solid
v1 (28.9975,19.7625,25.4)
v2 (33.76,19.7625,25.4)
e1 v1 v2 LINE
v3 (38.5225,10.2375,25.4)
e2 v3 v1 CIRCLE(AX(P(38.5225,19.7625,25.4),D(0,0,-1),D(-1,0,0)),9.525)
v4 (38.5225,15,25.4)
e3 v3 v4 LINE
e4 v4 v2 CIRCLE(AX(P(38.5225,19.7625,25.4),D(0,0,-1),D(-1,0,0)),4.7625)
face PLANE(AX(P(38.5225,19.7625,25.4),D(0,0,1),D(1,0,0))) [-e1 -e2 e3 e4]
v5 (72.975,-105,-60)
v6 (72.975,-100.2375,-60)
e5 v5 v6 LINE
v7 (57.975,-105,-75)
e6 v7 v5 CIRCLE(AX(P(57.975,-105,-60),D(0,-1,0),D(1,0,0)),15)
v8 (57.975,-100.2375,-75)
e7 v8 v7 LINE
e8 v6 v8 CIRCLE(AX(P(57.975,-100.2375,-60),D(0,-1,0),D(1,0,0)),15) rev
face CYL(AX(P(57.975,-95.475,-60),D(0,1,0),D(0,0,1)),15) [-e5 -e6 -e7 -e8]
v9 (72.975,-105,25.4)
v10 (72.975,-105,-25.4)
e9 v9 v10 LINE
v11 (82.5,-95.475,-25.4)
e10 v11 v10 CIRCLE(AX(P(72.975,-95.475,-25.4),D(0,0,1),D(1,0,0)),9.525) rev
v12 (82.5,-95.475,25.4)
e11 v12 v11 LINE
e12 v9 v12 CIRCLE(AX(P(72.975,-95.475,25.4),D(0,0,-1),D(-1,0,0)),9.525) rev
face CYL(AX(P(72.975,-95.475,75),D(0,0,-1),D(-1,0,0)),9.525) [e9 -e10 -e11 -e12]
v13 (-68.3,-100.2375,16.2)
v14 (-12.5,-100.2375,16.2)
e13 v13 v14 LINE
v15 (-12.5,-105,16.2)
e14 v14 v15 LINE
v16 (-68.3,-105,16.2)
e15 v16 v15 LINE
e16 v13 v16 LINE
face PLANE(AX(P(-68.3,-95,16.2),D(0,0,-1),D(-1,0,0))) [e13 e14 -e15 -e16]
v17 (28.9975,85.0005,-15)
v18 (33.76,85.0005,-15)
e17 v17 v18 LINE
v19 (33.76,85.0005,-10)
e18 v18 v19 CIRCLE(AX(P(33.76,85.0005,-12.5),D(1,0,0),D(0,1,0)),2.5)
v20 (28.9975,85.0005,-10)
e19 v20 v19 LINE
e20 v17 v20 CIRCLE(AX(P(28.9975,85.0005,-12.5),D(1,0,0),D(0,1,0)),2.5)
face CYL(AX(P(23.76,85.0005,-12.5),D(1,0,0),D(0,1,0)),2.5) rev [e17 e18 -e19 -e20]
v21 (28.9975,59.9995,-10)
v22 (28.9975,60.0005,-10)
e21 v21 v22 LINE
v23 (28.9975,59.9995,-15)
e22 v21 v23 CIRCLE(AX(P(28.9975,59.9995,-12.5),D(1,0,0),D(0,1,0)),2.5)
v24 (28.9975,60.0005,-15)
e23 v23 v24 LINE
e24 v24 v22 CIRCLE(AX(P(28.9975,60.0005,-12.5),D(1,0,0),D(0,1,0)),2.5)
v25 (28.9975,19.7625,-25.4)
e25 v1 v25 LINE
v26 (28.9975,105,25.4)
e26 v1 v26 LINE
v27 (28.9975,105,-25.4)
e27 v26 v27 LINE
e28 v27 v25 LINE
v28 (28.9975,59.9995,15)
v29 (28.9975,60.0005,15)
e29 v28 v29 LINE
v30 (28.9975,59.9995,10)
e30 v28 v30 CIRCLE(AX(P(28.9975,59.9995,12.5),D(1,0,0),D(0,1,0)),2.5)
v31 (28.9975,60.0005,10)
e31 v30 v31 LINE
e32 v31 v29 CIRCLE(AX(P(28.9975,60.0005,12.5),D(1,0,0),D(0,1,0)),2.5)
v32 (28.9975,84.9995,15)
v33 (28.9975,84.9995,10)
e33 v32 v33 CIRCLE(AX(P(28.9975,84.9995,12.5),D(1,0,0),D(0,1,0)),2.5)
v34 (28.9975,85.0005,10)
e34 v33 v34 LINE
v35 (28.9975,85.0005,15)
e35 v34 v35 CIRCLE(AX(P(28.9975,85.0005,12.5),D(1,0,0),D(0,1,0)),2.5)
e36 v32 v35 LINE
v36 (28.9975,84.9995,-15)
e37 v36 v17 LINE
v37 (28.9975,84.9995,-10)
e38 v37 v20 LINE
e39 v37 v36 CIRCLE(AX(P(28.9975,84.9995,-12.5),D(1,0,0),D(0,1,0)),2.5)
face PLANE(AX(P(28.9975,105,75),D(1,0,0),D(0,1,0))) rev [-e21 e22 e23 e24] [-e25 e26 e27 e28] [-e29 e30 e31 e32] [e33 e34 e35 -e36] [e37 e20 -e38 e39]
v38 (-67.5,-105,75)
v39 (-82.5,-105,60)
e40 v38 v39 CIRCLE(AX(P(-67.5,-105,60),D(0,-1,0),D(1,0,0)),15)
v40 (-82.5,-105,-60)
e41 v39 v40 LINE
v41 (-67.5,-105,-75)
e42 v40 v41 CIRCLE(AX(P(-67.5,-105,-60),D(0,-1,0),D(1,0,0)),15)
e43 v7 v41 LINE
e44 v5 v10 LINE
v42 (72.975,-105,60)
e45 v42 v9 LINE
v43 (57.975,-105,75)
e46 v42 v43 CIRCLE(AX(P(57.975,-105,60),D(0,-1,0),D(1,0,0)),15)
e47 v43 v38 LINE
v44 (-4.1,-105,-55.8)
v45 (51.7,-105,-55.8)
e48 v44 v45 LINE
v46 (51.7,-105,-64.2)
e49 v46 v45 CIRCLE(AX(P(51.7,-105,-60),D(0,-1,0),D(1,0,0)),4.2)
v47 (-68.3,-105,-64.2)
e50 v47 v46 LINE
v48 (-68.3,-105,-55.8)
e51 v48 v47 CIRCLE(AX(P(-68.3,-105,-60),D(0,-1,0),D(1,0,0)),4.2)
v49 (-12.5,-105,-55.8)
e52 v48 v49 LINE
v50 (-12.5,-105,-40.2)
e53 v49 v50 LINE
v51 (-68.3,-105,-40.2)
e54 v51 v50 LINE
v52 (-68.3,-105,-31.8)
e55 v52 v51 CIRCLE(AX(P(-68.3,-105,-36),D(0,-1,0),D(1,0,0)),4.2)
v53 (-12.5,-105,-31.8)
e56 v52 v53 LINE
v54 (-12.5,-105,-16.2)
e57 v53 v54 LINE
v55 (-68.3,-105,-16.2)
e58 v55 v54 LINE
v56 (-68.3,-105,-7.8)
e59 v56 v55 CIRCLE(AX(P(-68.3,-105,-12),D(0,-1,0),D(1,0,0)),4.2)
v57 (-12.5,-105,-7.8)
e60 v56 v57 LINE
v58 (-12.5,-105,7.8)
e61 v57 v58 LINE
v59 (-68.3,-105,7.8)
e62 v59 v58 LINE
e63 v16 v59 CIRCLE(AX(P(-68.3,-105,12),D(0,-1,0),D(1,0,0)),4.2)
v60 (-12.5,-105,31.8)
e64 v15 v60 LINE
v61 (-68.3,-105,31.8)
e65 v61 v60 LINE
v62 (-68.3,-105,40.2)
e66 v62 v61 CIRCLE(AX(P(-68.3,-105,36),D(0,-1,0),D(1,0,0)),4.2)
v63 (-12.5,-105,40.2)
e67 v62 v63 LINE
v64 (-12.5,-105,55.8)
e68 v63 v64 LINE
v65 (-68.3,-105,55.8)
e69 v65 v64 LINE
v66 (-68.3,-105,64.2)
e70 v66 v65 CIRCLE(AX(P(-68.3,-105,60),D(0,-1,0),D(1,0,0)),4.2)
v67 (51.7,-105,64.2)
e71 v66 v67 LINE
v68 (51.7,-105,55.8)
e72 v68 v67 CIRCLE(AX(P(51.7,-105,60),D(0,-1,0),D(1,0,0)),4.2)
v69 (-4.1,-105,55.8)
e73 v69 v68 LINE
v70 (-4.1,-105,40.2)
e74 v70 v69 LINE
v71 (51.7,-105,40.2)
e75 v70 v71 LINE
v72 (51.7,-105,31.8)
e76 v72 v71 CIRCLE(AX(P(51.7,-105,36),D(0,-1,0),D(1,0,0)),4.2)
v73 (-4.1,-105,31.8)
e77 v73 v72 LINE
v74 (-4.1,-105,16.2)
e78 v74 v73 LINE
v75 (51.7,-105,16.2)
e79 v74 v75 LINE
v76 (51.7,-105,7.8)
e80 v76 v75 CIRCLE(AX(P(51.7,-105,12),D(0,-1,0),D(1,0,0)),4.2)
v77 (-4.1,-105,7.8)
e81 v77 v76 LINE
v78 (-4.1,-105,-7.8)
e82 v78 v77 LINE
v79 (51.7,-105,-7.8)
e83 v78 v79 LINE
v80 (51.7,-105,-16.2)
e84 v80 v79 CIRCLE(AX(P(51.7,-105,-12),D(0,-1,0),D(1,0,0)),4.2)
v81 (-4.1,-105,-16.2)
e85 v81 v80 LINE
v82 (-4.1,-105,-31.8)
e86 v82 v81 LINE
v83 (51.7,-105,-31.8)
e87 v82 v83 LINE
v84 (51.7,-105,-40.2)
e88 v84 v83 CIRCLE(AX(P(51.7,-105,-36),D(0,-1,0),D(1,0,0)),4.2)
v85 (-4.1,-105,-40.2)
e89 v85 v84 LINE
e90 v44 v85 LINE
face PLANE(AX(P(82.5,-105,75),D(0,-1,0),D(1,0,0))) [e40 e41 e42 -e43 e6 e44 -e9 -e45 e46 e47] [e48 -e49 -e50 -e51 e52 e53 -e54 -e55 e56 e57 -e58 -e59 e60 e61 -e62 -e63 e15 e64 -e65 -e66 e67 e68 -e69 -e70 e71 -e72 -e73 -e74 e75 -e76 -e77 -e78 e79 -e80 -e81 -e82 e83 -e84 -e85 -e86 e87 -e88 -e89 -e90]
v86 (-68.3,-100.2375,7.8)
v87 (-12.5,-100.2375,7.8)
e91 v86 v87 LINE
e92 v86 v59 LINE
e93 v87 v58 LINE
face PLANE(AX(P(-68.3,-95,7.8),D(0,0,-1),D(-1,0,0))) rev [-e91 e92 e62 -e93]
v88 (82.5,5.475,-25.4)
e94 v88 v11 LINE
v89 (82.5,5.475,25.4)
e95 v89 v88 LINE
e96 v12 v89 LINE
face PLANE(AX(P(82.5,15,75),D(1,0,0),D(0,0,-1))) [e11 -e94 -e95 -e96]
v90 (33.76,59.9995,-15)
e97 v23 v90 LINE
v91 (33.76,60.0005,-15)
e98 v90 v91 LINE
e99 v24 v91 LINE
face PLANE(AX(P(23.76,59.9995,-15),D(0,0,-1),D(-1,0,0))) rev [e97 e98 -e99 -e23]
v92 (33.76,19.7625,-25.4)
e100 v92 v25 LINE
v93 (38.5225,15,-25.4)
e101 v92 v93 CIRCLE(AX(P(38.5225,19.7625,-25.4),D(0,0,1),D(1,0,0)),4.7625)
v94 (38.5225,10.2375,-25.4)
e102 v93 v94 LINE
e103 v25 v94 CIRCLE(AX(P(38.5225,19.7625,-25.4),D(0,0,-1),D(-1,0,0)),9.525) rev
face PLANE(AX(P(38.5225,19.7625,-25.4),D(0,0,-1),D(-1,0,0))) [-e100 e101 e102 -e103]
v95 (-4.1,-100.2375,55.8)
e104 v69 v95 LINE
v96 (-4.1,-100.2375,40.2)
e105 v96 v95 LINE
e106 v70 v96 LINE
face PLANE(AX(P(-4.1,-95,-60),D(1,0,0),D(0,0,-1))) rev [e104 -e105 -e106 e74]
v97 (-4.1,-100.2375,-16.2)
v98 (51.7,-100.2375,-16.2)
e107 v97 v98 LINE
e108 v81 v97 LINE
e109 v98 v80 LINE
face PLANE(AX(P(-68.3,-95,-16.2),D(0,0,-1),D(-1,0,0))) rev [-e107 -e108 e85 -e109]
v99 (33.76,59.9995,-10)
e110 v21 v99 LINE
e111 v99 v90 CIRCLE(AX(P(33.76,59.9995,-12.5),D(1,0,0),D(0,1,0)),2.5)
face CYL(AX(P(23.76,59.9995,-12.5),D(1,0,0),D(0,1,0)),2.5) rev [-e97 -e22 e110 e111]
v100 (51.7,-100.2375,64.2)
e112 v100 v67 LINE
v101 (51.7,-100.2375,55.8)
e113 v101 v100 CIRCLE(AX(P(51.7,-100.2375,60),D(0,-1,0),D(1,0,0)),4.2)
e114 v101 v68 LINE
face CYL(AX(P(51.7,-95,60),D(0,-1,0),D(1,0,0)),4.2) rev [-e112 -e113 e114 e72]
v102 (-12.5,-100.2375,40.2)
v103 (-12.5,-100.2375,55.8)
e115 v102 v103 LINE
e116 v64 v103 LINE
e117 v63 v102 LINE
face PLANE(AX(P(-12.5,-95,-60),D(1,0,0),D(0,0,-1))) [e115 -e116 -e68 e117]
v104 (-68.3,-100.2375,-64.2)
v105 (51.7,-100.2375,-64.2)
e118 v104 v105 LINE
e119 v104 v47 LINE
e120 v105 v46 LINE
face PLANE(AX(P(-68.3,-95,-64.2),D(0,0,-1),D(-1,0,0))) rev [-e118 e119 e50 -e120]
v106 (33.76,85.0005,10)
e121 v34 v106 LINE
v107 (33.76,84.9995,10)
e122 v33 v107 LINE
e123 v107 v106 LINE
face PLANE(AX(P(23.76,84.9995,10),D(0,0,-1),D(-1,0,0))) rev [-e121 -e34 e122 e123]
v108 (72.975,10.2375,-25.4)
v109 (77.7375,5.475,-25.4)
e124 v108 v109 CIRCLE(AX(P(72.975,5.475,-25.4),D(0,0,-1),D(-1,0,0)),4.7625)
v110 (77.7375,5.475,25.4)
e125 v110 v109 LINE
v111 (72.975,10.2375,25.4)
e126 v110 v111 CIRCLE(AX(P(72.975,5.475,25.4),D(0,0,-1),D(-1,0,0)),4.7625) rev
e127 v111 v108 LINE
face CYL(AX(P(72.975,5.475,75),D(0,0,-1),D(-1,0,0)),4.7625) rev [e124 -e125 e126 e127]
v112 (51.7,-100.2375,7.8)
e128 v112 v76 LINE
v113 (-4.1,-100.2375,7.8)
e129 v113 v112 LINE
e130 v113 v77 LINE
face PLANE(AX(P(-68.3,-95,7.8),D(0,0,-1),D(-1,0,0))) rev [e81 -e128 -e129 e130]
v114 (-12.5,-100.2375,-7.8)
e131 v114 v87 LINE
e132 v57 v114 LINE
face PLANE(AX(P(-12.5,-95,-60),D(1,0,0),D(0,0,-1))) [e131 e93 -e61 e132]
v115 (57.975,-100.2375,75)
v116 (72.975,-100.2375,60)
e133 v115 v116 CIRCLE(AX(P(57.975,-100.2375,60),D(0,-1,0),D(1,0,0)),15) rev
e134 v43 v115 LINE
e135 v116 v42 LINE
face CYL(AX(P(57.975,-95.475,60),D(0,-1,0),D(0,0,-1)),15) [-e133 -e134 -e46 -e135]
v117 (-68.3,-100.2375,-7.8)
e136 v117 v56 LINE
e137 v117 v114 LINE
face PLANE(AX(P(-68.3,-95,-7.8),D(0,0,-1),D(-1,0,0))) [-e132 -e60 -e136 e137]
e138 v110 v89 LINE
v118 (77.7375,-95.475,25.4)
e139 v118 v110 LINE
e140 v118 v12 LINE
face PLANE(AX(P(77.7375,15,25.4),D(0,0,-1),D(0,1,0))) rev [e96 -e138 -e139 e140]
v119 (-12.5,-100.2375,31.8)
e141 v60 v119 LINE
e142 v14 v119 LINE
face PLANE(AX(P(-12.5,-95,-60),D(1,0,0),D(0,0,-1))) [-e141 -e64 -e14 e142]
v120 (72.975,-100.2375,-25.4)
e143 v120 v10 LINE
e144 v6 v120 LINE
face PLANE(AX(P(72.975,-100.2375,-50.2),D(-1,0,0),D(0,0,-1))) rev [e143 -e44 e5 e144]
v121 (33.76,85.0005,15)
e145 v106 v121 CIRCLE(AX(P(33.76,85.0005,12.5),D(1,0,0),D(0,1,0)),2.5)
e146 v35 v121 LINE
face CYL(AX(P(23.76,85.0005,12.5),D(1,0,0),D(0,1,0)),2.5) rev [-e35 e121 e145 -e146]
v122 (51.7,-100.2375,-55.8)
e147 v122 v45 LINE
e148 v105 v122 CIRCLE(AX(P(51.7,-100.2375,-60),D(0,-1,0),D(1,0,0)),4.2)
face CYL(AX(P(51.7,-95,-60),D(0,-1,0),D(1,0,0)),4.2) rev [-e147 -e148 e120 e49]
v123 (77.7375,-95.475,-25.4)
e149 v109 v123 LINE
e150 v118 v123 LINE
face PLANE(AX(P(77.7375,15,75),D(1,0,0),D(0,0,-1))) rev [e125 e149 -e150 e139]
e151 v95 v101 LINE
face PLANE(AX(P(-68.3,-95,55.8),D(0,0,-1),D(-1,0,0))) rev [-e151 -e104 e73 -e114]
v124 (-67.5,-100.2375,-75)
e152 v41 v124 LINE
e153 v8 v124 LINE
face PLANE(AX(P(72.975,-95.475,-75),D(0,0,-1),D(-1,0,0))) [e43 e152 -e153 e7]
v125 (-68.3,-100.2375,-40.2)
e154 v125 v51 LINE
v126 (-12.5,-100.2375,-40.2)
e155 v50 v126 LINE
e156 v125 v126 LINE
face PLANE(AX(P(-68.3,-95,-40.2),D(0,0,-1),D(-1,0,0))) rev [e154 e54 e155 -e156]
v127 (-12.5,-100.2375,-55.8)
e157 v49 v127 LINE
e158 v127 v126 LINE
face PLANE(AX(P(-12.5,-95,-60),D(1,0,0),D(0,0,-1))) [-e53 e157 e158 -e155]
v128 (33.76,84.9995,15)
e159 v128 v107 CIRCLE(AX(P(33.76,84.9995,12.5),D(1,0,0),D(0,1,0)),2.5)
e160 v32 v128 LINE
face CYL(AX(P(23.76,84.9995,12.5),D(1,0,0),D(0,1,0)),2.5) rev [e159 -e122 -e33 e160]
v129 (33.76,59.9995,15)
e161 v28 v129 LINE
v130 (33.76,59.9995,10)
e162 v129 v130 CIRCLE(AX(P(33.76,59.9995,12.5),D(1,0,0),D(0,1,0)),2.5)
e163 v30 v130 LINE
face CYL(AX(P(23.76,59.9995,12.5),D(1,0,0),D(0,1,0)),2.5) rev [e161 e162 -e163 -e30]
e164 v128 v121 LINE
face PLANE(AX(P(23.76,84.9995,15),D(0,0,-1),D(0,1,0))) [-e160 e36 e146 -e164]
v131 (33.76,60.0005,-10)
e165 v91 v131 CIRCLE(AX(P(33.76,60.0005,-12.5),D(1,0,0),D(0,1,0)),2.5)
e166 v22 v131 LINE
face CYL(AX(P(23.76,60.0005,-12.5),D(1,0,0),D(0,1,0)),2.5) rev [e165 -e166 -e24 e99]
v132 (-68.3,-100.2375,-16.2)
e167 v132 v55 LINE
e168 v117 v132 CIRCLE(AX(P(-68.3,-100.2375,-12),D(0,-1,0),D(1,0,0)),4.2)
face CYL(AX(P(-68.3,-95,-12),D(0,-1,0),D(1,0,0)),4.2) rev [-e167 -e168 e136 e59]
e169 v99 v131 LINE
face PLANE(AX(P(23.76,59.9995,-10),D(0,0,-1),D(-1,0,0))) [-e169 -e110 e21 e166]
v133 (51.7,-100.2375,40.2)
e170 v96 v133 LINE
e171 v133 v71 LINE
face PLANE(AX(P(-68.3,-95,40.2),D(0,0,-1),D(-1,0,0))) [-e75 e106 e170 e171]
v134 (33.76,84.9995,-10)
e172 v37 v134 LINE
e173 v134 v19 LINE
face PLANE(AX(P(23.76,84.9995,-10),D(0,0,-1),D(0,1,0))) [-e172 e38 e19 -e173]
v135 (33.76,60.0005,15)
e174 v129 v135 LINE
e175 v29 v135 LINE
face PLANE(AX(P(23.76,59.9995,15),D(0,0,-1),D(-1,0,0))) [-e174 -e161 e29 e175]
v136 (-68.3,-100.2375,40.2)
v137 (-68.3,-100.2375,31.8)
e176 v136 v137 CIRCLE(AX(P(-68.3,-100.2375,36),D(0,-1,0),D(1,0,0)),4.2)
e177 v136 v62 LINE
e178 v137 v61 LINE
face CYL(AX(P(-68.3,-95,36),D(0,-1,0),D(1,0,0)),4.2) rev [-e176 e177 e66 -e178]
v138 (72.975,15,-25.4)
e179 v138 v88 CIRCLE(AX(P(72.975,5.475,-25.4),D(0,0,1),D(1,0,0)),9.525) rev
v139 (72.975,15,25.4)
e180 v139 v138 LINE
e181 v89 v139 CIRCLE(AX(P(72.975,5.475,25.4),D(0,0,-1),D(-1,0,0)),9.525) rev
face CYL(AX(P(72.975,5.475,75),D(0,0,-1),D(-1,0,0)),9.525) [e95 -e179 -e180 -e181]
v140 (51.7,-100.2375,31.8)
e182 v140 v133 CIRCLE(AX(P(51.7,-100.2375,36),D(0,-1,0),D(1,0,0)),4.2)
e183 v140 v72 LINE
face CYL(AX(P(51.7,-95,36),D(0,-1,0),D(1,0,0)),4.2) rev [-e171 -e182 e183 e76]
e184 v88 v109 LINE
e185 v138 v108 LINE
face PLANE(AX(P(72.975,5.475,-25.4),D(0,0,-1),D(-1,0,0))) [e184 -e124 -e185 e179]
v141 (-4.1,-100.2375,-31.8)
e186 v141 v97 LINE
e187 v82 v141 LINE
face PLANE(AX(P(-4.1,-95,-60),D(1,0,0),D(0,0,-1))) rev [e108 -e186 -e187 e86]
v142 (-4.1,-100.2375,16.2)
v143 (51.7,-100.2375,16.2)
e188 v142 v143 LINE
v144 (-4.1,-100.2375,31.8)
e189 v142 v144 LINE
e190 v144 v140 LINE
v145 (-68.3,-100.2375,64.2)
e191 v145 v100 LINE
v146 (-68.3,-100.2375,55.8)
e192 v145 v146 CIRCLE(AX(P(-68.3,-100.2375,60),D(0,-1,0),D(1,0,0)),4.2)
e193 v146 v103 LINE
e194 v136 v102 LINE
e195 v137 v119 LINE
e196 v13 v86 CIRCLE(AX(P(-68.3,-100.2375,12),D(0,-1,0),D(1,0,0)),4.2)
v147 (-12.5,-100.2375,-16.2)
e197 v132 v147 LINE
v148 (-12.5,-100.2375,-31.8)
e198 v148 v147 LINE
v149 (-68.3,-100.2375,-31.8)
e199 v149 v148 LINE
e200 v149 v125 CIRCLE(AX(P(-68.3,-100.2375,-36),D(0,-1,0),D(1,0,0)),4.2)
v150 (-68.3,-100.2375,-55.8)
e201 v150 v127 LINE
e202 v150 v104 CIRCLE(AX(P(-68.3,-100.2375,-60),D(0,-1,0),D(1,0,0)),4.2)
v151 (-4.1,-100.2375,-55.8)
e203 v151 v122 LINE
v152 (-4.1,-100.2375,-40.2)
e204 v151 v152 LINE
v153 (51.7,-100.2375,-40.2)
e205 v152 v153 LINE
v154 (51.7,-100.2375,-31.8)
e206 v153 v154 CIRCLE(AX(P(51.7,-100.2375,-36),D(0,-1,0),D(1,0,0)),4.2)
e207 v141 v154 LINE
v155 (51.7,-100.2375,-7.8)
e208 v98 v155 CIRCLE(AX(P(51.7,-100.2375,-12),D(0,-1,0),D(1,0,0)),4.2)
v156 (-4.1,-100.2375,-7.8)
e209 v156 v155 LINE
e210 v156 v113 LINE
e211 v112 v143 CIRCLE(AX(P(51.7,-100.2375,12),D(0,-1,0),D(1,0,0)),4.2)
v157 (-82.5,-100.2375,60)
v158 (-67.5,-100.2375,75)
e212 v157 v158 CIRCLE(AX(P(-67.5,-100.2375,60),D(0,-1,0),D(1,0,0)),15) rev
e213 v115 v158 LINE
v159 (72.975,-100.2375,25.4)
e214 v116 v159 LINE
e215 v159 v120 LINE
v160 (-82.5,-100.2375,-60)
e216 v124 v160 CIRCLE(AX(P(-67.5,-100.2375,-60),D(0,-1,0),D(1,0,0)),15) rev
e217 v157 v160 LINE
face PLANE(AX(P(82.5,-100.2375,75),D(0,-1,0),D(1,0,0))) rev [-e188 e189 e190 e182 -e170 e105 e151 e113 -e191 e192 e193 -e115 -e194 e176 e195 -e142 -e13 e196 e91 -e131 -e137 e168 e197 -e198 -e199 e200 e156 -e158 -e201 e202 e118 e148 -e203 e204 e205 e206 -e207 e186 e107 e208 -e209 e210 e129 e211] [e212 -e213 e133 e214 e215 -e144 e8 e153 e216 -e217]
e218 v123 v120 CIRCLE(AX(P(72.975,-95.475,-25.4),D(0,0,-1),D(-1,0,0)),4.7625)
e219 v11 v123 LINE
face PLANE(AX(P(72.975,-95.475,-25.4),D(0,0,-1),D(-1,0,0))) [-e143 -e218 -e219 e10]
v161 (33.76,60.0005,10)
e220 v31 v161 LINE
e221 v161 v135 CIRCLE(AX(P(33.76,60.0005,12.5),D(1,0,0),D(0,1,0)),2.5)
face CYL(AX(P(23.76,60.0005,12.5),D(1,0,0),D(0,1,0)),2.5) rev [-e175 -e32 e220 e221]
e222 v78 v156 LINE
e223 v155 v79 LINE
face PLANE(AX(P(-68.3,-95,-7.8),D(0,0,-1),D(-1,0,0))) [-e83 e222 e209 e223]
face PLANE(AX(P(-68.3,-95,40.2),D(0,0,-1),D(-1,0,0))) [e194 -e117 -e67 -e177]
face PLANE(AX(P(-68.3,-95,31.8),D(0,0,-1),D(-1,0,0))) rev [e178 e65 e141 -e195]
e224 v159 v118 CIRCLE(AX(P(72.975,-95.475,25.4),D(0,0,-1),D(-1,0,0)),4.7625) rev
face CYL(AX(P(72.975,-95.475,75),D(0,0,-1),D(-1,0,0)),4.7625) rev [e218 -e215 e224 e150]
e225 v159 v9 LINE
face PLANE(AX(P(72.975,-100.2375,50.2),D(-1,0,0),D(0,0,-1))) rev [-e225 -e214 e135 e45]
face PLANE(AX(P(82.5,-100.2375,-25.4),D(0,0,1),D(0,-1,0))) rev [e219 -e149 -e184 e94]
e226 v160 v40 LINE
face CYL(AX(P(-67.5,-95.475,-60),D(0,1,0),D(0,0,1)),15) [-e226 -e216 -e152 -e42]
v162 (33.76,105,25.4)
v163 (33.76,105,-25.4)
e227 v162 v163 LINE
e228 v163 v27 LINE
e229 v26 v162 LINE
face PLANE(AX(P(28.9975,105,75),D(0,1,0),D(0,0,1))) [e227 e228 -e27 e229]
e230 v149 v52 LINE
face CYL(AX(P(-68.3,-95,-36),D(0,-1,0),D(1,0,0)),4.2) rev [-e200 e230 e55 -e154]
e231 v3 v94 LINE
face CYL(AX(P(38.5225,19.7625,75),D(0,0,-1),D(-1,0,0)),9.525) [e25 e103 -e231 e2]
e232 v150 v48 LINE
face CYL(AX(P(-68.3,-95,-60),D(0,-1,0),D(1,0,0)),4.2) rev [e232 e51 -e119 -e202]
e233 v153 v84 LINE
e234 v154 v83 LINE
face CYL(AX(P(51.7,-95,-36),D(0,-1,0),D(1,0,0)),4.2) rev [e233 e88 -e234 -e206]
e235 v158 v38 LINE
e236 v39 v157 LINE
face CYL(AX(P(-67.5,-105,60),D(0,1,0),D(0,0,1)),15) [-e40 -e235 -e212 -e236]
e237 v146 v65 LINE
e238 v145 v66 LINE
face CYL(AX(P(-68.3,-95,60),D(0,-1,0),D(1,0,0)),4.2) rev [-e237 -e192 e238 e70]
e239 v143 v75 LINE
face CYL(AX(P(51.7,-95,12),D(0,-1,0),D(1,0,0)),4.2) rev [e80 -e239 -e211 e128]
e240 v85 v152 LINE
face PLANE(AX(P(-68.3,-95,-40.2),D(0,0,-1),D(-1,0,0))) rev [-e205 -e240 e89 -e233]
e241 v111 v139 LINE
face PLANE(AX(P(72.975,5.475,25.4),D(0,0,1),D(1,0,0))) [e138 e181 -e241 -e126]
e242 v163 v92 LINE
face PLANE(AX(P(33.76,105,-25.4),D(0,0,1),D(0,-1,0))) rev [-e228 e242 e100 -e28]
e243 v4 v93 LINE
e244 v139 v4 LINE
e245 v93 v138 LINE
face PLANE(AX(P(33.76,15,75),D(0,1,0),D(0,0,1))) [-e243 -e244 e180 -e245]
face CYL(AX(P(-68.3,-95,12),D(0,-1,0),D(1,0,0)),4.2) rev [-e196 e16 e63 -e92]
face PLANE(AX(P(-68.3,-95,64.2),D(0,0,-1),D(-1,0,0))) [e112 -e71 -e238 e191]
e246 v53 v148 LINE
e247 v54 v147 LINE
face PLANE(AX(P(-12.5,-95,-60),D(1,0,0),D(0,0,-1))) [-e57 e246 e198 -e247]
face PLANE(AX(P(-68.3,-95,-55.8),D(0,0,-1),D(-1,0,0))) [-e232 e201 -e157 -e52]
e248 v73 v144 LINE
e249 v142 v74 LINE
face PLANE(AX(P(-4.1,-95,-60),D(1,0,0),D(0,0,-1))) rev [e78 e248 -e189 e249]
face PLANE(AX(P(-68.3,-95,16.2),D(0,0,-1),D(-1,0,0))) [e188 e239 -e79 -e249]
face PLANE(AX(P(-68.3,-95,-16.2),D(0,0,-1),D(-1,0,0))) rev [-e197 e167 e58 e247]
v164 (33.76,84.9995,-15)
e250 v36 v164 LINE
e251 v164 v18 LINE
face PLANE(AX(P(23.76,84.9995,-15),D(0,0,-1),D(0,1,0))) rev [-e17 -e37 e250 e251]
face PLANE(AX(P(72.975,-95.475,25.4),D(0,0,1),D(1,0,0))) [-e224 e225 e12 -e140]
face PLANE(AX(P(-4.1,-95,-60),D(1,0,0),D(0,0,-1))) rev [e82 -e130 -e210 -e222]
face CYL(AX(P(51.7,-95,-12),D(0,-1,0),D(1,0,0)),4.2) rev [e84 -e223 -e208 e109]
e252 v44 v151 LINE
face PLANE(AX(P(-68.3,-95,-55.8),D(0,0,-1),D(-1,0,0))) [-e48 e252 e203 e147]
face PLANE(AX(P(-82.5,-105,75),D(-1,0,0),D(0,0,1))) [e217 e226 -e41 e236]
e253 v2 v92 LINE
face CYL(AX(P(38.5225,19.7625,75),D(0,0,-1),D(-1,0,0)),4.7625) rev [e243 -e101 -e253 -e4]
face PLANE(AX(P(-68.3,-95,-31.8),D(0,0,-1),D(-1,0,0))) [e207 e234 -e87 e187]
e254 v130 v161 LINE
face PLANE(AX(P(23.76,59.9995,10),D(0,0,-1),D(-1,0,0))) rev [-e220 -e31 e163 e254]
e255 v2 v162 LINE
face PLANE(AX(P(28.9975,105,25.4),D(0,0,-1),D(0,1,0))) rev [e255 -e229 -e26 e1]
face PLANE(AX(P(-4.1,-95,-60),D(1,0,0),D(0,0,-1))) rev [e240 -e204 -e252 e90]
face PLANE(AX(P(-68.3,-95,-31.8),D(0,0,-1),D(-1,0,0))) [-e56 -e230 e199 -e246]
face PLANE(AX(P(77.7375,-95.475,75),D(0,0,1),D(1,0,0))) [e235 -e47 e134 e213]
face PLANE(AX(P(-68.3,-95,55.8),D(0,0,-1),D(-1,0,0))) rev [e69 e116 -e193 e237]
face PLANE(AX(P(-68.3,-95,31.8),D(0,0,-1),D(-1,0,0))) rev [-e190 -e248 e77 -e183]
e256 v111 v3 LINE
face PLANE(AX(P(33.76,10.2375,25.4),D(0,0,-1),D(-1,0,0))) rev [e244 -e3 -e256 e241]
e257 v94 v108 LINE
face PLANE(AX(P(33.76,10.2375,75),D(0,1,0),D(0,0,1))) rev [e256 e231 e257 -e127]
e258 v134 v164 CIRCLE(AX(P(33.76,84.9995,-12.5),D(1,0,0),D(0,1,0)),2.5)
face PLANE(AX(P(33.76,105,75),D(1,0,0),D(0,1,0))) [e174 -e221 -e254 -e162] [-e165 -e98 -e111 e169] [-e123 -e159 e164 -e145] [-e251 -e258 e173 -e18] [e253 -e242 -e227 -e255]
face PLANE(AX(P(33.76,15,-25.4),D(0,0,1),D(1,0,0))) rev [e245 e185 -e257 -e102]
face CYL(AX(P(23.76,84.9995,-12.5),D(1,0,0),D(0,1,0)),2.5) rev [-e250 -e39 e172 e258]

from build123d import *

# Parameters (mm, degrees)
BRIDA_BASE1_DEPTH           = 75
CORTAR_EXTRUIR1_START       = -9.525
CORTAR_EXTRUIR1_OUTLINE_W   = 49.6
CORTAR_EXTRUIR1_OUTLINE_H   = 121
CORTAR_EXTRUIR1_DEPTH       = 9.525
CORTAR_EXTRUIR1_START_2     = -53.5025
CORTAR_EXTRUIR1_2_OUTLINE_W = 49.6
CORTAR_EXTRUIR1_2_OUTLINE_H = 94.7625
CORTAR_EXTRUIR1_2_DEPTH     = 43.9775
CORTAR_EXTRUIR2_DEPTH       = 10
CORTAR_EXTRUIR3_DEPTH       = 10
REDONDEO1_R                 = 15


# Read off the part's stored shape, not the designer's step: Cortar-Extruir1
# Sheet-metal steps are written as plain solids
with BuildPart() as part:
    # Croquis1 → Brida base1 (new, symmetric)
    with BuildSketch(Plane.XY):
        with BuildLine():
            Line((33.76, 105), (33.76, 19.7625))
            ThreePointArc((33.76, 19.7625), (35.154903955, 16.394903955), (38.5225, 15))
            Line((38.5225, 15), (72.975, 15))
            ThreePointArc((72.975, 15), (79.710192091, 12.210192091), (82.5, 5.475))
            Line((82.5, 5.475), (82.5, -95.475))
            ThreePointArc((82.5, -95.475), (79.710192091, -102.210192091), (72.975, -105))
            Line((72.975, -105), (-82.5, -105))
            Line((-82.5, -105), (-82.5, -100.2375))
            Line((-82.5, -100.2375), (72.975, -100.2375))
            ThreePointArc((72.975, -100.2375), (76.342596045, -98.842596045), (77.7375, -95.475))
            Line((77.7375, -95.475), (77.7375, 5.475))
            ThreePointArc((77.7375, 5.475), (76.342596045, 8.842596045), (72.975, 10.2375))
            Line((72.975, 10.2375), (38.5225, 10.2375))
            ThreePointArc((38.5225, 10.2375), (31.787307909, 13.027307909), (28.9975, 19.7625))
            Line((28.9975, 19.7625), (28.9975, 105))
            Line((28.9975, 105), (33.76, 105))
        make_face()
    extrude(amount=BRIDA_BASE1_DEPTH, both=True)

    # Cortar-Extruir1 outline → Cortar-Extruir1 (cut)
    with BuildSketch(Plane(origin=(82.5, 0, 0), x_dir=(0, 0, -1), z_dir=(1, 0, 0)).offset(CORTAR_EXTRUIR1_START)):
        with Locations((50.2, -45.5)):
            Rectangle(CORTAR_EXTRUIR1_OUTLINE_W, CORTAR_EXTRUIR1_OUTLINE_H)
        with Locations((-50.2, -45.5)):
            Rectangle(CORTAR_EXTRUIR1_OUTLINE_W, CORTAR_EXTRUIR1_OUTLINE_H)
    extrude(amount=CORTAR_EXTRUIR1_DEPTH, mode=Mode.SUBTRACT)

    # Cortar-Extruir1 2 outline → Cortar-Extruir1 2 (cut)
    with BuildSketch(Plane(origin=(82.5, 0, 0), x_dir=(0, 0, -1), z_dir=(1, 0, 0)).offset(CORTAR_EXTRUIR1_START_2)):
        with Locations((50.2, 57.61875)):
            Rectangle(CORTAR_EXTRUIR1_2_OUTLINE_W, CORTAR_EXTRUIR1_2_OUTLINE_H)
        with Locations((-50.2, 57.61875)):
            Rectangle(CORTAR_EXTRUIR1_2_OUTLINE_W, CORTAR_EXTRUIR1_2_OUTLINE_H)
    extrude(amount=CORTAR_EXTRUIR1_2_DEPTH, mode=Mode.SUBTRACT)

    # Croquis7 → Cortar-Extruir2 (cut)
    with BuildSketch(Plane(origin=(33.76, 0, 0), x_dir=(0, 0, -1), z_dir=(1, 0, 0))):
        with BuildLine():
            ThreePointArc((-15, 84.9995), (-12.5, 82.4995), (-10, 84.9995))
            ThreePointArc((-10, 84.9995), (-12.5, 87.5005), (-15, 84.9995))
        make_face()
        with BuildLine():
            ThreePointArc((10, 84.9995), (12.5, 82.4995), (15, 84.9995))
            ThreePointArc((15, 84.9995), (12.5, 87.5005), (10, 84.9995))
        make_face()
        with BuildLine():
            ThreePointArc((10, 59.9995), (12.5, 57.4995), (15, 59.9995))
            ThreePointArc((15, 59.9995), (12.5, 62.5005), (10, 59.9995))
        make_face()
        with BuildLine():
            ThreePointArc((-15, 59.9995), (-12.5, 57.4995), (-10, 59.9995))
            ThreePointArc((-10, 59.9995), (-12.5, 62.5005), (-15, 59.9995))
        make_face()
    extrude(amount=-CORTAR_EXTRUIR2_DEPTH, mode=Mode.SUBTRACT)

    # Croquis8 → Cortar-Extruir3 (cut)
    with BuildSketch(Plane.XZ.offset(105)):
        with BuildLine():
            Line((-68.3, -64.2), (51.7, -64.2))
            ThreePointArc((51.7, -64.2), (55.9, -60), (51.7, -55.8))
            Line((51.7, -55.8), (-4.1, -55.8))
            Line((-4.1, -55.8), (-4.1, -40.2))
            Line((-4.1, -40.2), (51.7, -40.2))
            ThreePointArc((51.7, -40.2), (55.9, -36), (51.7, -31.8))
            Line((51.7, -31.8), (-4.1, -31.8))
            Line((-4.1, -31.8), (-4.1, -16.2))
            Line((-4.1, -16.2), (51.7, -16.2))
            ThreePointArc((51.7, -16.2), (55.9, -12), (51.7, -7.8))
            Line((51.7, -7.8), (-4.1, -7.8))
            Line((-4.1, -7.8), (-4.1, 7.8))
            Line((-4.1, 7.8), (51.7, 7.8))
            ThreePointArc((51.7, 7.8), (55.9, 12), (51.7, 16.2))
            Line((51.7, 16.2), (-4.1, 16.2))
            Line((-4.1, 16.2), (-4.1, 31.8))
            Line((-4.1, 31.8), (51.7, 31.8))
            ThreePointArc((51.7, 31.8), (55.9, 36), (51.7, 40.2))
            Line((51.7, 40.2), (-4.1, 40.2))
            Line((-4.1, 40.2), (-4.1, 55.8))
            Line((-4.1, 55.8), (51.7, 55.8))
            ThreePointArc((51.7, 55.8), (55.9, 60), (51.7, 64.2))
            Line((51.7, 64.2), (-68.3, 64.2))
            ThreePointArc((-68.3, 64.2), (-72.5, 60), (-68.3, 55.8))
            Line((-68.3, 55.8), (-12.5, 55.8))
            Line((-12.5, 55.8), (-12.5, 40.2))
            Line((-12.5, 40.2), (-68.3, 40.2))
            ThreePointArc((-68.3, 40.2), (-72.5, 36), (-68.3, 31.8))
            Line((-68.3, 31.8), (-12.5, 31.8))
            Line((-12.5, 31.8), (-12.5, 16.2))
            Line((-12.5, 16.2), (-68.3, 16.2))
            ThreePointArc((-68.3, 16.2), (-72.5, 12), (-68.3, 7.8))
            Line((-68.3, 7.8), (-12.5, 7.8))
            Line((-12.5, 7.8), (-12.5, -7.8))
            Line((-12.5, -7.8), (-68.3, -7.8))
            ThreePointArc((-68.3, -7.8), (-72.5, -12), (-68.3, -16.2))
            Line((-68.3, -16.2), (-12.5, -16.2))
            Line((-12.5, -16.2), (-12.5, -31.8))
            Line((-12.5, -31.8), (-68.3, -31.8))
            ThreePointArc((-68.3, -31.8), (-72.5, -36), (-68.3, -40.2))
            Line((-68.3, -40.2), (-12.5, -40.2))
            Line((-12.5, -40.2), (-12.5, -55.8))
            Line((-12.5, -55.8), (-68.3, -55.8))
            ThreePointArc((-68.3, -55.8), (-72.5, -60), (-68.3, -64.2))
        make_face()
    extrude(amount=-CORTAR_EXTRUIR3_DEPTH, mode=Mode.SUBTRACT)

    # Redondeo1
    redondeo1_edges = [part.edges().sort_by_distance(p)[0] for p in [
        (-82.5, -102.61875, -75),
        (72.975, -102.61875, -75),
        (72.975, -102.61875, 75),
        (-82.5, -102.61875, 75),
    ]]
    fillet(redondeo1_edges, radius=REDONDEO1_R)


solid = part.part
